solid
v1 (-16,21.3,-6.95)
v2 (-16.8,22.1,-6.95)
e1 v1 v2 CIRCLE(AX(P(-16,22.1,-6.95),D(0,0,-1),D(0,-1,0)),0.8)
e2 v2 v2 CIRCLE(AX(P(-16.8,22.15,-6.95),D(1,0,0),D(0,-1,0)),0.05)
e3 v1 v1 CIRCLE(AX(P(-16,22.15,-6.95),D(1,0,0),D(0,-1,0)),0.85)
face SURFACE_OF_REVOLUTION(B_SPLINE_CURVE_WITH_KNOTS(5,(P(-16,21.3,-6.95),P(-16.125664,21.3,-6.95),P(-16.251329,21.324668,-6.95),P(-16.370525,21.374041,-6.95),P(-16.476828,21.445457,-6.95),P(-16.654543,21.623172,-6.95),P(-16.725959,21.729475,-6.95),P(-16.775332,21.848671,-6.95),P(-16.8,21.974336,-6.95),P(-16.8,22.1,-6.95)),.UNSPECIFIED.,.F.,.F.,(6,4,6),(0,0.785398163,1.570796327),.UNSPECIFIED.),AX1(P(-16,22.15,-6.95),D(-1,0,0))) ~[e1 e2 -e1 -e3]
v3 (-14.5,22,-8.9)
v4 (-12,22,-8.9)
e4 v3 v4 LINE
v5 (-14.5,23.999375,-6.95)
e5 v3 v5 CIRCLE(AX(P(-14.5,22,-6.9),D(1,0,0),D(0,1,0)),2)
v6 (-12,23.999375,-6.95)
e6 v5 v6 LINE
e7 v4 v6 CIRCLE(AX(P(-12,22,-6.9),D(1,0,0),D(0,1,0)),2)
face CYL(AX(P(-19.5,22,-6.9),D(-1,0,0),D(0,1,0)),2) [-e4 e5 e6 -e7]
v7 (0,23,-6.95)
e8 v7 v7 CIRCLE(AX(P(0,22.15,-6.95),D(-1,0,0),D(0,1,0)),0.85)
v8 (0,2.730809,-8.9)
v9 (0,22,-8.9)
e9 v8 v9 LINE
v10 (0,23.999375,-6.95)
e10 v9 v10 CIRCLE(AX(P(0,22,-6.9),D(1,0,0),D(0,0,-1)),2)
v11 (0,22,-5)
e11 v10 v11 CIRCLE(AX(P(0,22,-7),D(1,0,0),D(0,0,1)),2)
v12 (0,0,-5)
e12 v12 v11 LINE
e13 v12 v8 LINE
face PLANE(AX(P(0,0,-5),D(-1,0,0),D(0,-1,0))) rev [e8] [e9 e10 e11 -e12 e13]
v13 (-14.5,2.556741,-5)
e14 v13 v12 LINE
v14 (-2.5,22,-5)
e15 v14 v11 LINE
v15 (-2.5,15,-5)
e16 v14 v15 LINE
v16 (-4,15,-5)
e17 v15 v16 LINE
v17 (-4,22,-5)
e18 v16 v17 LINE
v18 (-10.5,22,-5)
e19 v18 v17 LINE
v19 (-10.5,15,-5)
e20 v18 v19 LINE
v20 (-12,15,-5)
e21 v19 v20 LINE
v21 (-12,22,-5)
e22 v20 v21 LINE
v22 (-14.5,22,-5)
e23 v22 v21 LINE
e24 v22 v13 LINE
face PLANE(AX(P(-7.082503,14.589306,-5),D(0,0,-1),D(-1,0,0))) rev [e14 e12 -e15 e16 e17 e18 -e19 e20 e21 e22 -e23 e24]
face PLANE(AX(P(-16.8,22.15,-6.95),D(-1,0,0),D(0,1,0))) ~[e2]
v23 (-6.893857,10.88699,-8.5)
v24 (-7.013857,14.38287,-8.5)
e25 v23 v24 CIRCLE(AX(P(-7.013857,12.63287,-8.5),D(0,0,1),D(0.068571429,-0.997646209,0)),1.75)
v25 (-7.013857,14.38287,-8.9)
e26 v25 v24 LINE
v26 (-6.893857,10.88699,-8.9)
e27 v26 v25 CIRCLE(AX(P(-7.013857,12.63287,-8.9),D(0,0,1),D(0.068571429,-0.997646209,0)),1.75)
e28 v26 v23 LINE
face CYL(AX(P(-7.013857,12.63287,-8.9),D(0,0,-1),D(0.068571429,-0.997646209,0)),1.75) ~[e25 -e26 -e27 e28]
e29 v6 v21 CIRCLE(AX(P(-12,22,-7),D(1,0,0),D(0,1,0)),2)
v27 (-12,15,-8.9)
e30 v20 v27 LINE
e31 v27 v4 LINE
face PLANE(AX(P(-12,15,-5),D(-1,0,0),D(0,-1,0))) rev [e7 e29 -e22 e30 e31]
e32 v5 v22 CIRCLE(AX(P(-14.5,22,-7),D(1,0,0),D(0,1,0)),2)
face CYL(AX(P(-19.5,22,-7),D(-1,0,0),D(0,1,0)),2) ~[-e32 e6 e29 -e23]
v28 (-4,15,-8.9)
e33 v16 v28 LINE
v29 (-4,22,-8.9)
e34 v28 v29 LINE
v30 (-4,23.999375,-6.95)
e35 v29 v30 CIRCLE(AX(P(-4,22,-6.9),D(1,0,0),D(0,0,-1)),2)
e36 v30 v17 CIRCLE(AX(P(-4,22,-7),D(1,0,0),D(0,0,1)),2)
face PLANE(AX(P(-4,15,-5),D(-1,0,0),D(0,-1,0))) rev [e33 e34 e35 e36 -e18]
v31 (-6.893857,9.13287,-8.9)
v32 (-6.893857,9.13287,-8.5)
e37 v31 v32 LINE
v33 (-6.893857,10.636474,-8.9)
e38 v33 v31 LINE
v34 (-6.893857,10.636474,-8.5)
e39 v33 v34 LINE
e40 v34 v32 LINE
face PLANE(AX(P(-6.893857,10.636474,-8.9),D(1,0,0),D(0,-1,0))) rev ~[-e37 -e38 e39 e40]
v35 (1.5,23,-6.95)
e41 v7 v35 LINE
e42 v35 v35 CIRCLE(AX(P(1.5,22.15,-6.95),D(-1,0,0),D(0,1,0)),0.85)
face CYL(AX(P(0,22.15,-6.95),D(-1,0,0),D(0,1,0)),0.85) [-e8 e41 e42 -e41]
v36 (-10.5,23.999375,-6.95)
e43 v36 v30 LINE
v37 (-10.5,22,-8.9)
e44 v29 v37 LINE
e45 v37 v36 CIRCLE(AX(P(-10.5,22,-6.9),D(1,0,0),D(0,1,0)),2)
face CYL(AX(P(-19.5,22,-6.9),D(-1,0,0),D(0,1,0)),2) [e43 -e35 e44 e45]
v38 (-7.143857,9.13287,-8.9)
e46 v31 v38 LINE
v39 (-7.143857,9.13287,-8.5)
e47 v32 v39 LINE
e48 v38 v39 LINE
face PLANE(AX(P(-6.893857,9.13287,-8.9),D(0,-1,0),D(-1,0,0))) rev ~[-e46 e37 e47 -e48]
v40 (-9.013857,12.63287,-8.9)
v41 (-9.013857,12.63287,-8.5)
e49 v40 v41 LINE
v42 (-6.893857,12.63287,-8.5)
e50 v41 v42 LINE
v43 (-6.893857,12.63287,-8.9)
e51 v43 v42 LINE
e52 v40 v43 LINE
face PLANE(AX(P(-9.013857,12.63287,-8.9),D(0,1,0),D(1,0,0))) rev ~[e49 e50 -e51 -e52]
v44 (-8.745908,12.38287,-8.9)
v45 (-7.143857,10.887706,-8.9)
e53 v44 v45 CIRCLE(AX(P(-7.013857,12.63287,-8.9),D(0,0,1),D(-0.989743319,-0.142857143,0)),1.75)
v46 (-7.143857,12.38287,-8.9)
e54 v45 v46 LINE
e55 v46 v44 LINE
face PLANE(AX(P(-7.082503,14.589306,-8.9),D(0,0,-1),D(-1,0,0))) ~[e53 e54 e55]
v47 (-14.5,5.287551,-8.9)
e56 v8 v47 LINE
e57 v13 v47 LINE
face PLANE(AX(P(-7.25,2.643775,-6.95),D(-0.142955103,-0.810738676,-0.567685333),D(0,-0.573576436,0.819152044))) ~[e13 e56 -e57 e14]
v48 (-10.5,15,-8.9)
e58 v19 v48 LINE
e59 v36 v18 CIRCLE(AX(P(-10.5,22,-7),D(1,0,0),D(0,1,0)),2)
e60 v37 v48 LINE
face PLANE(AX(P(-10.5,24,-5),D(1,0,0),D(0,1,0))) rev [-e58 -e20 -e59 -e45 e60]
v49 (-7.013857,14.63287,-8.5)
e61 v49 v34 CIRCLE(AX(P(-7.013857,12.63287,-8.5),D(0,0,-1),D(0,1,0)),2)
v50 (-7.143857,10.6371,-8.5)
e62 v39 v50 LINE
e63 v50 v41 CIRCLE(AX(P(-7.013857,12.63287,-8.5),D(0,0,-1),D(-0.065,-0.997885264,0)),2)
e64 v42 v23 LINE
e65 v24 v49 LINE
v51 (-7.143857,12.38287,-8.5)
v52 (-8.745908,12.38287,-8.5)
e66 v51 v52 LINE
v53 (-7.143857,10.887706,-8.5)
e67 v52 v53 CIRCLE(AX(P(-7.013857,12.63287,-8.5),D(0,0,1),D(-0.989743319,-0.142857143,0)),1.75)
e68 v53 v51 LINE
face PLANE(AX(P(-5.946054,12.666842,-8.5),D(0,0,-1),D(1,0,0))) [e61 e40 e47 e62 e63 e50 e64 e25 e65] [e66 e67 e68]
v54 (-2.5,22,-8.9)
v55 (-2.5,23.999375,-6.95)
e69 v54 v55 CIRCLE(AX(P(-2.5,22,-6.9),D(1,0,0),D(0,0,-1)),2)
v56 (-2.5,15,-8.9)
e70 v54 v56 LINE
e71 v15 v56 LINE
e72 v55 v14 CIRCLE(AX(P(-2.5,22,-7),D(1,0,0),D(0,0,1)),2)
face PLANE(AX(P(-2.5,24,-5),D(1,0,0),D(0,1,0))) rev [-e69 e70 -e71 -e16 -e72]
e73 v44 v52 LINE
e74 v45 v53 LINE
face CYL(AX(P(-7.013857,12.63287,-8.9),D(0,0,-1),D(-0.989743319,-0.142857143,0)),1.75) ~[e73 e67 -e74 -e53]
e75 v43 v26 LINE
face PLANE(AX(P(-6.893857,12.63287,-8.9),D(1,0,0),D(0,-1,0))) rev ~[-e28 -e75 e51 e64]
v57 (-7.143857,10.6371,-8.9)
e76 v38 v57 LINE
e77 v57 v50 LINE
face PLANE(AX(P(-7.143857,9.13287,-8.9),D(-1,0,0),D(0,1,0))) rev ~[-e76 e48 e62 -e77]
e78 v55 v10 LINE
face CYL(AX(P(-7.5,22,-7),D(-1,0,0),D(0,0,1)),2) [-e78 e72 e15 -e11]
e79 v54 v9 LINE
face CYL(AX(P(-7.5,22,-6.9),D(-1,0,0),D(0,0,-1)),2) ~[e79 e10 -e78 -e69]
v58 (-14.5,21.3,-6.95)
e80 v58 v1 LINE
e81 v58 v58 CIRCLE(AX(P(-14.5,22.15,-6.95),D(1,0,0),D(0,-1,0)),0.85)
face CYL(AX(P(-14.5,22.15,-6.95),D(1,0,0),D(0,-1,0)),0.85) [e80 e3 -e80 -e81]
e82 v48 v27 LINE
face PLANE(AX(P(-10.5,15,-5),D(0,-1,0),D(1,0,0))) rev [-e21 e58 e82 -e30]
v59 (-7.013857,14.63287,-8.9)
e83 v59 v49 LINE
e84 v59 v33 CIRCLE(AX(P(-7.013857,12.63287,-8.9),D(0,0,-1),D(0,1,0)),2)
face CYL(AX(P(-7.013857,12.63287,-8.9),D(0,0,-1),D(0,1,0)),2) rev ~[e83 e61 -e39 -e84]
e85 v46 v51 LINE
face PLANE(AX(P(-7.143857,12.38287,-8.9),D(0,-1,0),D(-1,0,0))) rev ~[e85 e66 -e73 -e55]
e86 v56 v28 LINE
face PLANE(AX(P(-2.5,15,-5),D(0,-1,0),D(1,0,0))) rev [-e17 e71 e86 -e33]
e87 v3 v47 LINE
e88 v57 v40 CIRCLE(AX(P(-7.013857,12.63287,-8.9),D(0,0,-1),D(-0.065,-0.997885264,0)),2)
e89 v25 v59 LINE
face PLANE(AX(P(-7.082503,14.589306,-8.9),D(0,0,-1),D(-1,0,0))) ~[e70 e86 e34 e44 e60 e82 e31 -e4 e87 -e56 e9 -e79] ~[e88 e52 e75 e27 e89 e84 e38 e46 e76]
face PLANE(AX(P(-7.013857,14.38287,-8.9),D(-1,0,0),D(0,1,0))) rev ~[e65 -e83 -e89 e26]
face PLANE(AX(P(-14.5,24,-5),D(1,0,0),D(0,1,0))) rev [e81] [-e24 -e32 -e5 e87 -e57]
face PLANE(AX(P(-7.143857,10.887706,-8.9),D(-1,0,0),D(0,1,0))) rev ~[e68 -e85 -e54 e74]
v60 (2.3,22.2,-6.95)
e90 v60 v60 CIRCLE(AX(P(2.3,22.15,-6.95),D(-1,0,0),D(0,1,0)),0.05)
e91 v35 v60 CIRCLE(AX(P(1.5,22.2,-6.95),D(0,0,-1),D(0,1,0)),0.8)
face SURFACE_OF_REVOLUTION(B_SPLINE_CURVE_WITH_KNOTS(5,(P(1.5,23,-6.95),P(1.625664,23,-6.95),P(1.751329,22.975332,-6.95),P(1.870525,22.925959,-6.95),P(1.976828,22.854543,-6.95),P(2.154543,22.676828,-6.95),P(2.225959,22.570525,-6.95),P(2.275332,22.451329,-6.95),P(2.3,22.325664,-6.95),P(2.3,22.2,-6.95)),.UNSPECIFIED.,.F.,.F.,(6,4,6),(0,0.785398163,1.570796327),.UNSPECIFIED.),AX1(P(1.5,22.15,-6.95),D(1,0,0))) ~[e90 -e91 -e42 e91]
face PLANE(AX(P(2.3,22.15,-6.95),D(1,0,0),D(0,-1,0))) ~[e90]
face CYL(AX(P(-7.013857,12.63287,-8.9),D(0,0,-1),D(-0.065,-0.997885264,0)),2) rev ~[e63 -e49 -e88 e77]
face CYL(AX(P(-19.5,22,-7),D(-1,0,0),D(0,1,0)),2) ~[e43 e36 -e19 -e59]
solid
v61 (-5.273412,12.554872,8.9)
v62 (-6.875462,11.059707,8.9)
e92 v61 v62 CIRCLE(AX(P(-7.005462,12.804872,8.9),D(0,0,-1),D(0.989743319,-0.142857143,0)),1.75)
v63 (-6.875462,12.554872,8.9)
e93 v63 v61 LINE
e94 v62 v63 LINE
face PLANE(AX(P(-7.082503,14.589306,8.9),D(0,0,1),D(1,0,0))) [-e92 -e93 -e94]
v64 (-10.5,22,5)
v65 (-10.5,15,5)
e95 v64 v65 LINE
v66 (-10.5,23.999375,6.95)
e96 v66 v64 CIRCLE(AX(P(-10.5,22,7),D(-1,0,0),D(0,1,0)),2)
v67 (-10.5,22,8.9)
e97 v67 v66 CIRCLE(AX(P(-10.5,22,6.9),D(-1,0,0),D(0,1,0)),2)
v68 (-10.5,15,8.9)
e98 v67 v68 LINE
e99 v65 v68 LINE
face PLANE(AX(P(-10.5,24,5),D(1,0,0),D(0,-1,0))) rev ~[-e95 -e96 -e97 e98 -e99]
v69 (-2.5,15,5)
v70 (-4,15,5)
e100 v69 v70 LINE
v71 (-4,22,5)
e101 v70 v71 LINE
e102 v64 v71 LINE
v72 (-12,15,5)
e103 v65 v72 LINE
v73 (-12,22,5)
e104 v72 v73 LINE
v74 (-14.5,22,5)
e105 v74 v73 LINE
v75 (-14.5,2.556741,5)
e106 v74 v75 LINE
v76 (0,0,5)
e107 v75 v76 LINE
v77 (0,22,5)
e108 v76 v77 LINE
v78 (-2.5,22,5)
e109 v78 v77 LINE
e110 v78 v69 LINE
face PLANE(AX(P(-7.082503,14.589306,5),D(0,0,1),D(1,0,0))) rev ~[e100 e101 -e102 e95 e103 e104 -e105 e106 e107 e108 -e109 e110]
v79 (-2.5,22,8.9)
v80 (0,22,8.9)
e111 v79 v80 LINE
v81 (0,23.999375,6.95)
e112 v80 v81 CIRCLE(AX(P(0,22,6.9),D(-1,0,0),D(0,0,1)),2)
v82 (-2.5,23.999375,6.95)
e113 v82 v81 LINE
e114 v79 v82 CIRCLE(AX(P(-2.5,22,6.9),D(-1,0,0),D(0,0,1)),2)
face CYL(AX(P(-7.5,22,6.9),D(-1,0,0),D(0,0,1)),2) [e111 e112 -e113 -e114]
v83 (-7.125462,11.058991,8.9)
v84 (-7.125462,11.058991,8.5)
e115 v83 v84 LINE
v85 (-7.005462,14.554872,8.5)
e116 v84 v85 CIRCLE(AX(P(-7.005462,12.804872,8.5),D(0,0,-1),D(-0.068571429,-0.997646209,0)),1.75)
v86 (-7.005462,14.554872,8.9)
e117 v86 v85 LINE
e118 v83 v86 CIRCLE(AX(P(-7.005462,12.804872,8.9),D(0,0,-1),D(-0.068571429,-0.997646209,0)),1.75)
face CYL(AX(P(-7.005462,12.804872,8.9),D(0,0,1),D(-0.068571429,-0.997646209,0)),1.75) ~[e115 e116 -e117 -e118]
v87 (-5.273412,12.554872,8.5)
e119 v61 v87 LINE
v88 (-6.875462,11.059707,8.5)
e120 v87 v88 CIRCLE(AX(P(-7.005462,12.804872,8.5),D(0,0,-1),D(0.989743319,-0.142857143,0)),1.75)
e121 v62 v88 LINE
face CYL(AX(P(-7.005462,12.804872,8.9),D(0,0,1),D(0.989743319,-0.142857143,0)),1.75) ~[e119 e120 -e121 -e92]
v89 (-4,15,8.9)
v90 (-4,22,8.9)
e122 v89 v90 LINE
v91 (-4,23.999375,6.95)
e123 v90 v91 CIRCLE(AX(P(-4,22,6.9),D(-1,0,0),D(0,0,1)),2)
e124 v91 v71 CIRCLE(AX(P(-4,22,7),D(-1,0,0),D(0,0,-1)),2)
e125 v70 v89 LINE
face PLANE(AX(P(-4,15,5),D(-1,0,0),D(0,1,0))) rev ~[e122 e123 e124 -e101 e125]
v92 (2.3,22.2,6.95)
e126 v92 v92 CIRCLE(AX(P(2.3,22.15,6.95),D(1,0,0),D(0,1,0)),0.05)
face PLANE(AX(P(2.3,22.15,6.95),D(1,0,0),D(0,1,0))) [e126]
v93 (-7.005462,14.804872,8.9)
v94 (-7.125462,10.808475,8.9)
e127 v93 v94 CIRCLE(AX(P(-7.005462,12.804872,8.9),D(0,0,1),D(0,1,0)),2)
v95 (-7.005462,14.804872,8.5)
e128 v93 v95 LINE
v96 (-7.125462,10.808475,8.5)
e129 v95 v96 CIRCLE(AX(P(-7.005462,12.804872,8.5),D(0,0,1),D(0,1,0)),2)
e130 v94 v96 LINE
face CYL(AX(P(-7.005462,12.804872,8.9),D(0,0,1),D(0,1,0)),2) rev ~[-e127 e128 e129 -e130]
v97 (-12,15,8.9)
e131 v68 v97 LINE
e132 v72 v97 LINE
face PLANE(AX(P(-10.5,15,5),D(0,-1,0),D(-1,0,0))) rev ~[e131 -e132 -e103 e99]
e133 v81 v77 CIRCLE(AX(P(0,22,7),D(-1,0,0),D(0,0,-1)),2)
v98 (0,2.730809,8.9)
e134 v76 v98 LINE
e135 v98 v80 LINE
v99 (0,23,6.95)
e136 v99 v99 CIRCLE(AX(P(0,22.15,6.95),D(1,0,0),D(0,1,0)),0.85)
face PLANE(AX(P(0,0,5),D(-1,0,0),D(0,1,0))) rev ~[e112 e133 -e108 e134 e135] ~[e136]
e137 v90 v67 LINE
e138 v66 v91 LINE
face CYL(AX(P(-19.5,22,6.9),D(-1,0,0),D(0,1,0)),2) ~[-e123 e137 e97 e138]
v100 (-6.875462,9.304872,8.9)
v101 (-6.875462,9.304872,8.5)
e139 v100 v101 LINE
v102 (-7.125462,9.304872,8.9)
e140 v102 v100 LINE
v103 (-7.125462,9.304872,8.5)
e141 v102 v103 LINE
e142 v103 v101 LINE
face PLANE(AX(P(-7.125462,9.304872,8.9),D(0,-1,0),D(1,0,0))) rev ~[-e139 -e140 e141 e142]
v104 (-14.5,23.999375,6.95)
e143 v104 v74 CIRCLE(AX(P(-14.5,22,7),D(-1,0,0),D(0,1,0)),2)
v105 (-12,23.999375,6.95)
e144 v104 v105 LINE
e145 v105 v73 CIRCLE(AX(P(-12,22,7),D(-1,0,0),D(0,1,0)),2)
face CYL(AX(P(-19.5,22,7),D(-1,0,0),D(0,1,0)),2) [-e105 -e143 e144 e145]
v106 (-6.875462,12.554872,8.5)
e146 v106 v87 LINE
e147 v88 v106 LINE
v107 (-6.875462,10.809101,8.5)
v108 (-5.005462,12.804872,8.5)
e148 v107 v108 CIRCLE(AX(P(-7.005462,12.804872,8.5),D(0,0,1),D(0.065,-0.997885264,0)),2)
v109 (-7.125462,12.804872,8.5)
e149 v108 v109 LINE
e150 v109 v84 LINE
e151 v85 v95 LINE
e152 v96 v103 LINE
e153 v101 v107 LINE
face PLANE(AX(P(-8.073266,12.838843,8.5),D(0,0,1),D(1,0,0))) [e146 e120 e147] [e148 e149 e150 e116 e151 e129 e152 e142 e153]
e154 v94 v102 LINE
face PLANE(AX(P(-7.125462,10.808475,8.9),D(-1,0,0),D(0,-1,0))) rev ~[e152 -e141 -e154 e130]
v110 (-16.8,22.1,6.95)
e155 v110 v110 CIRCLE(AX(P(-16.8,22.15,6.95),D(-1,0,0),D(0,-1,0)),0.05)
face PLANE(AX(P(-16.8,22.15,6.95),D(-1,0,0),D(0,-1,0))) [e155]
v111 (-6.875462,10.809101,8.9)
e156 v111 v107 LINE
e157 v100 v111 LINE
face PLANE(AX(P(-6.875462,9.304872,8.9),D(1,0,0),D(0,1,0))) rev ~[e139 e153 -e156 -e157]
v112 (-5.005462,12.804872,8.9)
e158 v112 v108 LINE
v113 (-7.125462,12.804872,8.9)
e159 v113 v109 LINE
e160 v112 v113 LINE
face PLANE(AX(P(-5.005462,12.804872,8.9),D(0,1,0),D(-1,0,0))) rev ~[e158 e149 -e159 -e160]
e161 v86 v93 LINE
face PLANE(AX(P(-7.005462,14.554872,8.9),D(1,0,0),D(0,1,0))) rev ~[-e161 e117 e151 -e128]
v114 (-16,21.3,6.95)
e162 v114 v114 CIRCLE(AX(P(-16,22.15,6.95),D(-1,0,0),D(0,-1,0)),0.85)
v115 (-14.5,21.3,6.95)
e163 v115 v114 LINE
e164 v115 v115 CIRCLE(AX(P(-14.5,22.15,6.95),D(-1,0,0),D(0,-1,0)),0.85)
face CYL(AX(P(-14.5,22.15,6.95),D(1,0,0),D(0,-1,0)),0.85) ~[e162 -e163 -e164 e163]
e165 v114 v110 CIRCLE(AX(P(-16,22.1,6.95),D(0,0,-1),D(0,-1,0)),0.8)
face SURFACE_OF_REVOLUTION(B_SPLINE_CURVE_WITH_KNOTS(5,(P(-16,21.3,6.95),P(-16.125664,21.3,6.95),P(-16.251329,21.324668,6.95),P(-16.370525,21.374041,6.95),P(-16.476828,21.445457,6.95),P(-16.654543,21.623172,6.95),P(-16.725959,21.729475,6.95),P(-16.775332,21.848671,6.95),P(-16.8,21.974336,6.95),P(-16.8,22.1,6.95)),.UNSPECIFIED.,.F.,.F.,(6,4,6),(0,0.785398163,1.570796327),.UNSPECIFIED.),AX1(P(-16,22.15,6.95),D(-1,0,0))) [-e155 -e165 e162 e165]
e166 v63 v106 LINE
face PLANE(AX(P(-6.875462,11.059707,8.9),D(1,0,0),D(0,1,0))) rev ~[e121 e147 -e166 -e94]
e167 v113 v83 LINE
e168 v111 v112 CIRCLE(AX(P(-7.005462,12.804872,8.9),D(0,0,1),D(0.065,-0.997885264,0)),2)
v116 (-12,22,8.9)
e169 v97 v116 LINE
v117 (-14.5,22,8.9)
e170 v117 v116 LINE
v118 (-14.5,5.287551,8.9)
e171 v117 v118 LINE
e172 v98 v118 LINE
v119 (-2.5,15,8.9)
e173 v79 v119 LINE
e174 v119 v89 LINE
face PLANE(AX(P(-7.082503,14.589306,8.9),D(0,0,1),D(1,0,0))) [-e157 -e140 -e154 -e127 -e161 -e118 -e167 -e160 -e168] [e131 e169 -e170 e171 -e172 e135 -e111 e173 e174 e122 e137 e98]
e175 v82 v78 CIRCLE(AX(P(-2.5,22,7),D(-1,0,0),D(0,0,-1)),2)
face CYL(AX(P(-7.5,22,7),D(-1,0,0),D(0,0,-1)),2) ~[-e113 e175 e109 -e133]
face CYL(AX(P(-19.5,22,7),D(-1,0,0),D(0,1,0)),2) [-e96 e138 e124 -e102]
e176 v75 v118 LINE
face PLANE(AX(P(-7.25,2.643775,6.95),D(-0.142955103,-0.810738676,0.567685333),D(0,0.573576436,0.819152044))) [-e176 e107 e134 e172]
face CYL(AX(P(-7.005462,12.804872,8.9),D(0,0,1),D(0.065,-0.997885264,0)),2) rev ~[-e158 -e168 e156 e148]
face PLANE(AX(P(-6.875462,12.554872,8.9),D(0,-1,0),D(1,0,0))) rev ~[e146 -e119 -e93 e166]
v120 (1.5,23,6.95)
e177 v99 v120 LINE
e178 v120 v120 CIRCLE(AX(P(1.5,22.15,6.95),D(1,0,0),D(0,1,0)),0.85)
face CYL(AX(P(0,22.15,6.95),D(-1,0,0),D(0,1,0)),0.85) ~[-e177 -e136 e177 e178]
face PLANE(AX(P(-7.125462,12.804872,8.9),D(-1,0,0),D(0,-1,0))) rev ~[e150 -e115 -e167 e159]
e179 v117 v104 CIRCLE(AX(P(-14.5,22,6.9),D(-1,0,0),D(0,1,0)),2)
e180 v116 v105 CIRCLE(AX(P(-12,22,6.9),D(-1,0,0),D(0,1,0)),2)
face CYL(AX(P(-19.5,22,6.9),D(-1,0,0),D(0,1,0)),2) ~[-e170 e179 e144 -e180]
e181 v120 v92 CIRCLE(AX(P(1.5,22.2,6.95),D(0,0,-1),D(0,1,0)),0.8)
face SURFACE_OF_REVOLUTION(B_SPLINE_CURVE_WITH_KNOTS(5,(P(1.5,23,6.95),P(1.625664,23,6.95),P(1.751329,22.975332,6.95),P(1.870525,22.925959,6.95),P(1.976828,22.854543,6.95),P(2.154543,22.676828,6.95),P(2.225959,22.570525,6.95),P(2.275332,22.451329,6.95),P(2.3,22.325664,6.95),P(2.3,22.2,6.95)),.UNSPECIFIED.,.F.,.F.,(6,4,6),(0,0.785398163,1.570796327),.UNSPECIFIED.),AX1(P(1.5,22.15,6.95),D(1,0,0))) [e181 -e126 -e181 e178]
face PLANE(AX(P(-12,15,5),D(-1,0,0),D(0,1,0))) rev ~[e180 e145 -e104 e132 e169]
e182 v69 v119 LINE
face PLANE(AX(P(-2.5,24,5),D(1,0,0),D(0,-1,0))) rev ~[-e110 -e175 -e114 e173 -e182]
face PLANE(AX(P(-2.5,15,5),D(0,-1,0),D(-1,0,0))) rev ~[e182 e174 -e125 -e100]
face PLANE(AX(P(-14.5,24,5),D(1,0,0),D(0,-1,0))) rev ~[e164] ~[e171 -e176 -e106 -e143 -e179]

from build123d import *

# Parameters (mm, degrees)
F1_DEPTH    = 3.9
F2_R        = 0.85
F3_DEPTH    = 2.3
F4_R        = 0.85
F5_DEPTH    = 2.3
F6_R        = 0.8
F7_T1_DEPTH = 12.5
F7_T3_DEPTH = 12.5
F13_DEPTH   = 0.4
F15_DEPTH   = 0.4


# Not quite as in the source:
# - a fillet or chamfer that OpenCascade refuses, or shapes differently, is made with other operations: its cross-section is extruded or revolved along the edge and cut away or added
# - a feature names something its author has since deleted; it is built from what else it names


with BuildPart() as f1:
    # F0 (on Top) → F1 (new body)
    with BuildSketch(Plane.XY):
        Polygon((-14.5, 2.5567412203), (0, 0), (0, 24), (-2.5, 24), (-2.5, 15), (-4, 15), (-4, 24), (-10.5, 24), (-10.5, 15), (-12, 15), (-12, 24), (-14.5, 24), align=None)
    extrude(amount=F1_DEPTH)

    # F2 (on face) → F3 (join)
    with BuildSketch(Plane.YZ):
        with Locations((22.15, 1.95)):
            Circle(F2_R)
    extrude(amount=F3_DEPTH)

    # F4 (on face) → F5 (join)
    with BuildSketch(Plane(origin=(-14.5, 0, 0), x_dir=(0, -1, 0), z_dir=(-1, 0, 0))):
        with Locations((-22.15, 1.95)):
            Circle(F4_R)
    extrude(amount=F5_DEPTH)

    # F6
    f6_edges = [f1.edges().sort_by_distance(p)[0] for p in [
        (2.3, 21.3, 1.95),
        (-16.8, 23, 1.95),
    ]]
    fillet(f6_edges, radius=F6_R)

    # F7: fillet of radius 2 on 4 edges, made by hand

    # F7_s2 → F7_t1 (cut)
    with BuildSketch(Plane.YZ.offset(-19.5)):
        with BuildLine():
            ThreePointArc((24, 1.9), (23.4142135624, 3.3142135624), (22, 3.9))
            Line((22, 3.9), (24, 3.9))
            Line((24, 3.9), (24, 1.9))
        make_face()
        with BuildLine():
            ThreePointArc((24, 2), (23.4142135624, 0.5857864376), (22, 0))
            Line((22, 0), (24, 0))
            Line((24, 0), (24, 2))
        make_face()
    extrude(amount=F7_T1_DEPTH, mode=Mode.SUBTRACT)

    # F7_s4 → F7_t3 (cut)
    with BuildSketch(Plane.YZ.offset(-7.5)):
        with BuildLine():
            ThreePointArc((22, 3.9), (23.4142135624, 3.3142135624), (24, 1.9))
            Line((24, 1.9), (24, 3.9))
            Line((24, 3.9), (22, 3.9))
        make_face()
        with BuildLine():
            ThreePointArc((22, 0), (23.4142135624, 0.5857864376), (24, 2))
            Line((24, 2), (24, 0))
            Line((24, 0), (22, 0))
        make_face()
    extrude(amount=F7_T3_DEPTH, mode=Mode.SUBTRACT)

    # F9: sweep along a path in F9_path
    with BuildLine(Plane(origin=(0, 0, 3.9), x_dir=(0.984807753, -0.1736481777, 0), z_dir=(0.1736481777, 0.984807753, 0))) as f9_path:
        Line((0, 0), (-14.7236858723, 0))
    # F8 (on face) → F9 (sweep, cut)
    with BuildSketch(Plane.YZ):
        Polygon((0, 3.9), (0, 0), (2.730809399, 3.9), align=None)
    sweep(path=f9_path.line, mode=Mode.SUBTRACT)


with BuildPart() as f1_1:
    # F10: moved
    add(f1.part.moved(Location((0, 0, 5))))


with BuildPart() as f11_1:
    # F11: instance of F1
    add(f1_1.part.mirror(Plane.XY))

    # F14 (on face) → F15 (cut)
    with BuildSketch(Plane(origin=(0, 0, -8.9), x_dir=(1, 0, 0), z_dir=(0, 0, -1))):
        with BuildLine():
            Line((-7.0138571055, -14.382870473), (-7.0138571055, -14.632870473))
            ThreePointArc((-7.0138571055, -14.632870473), (-5.0147581199, -12.6928975156), (-6.8938571055, -10.6364737188))
            Line((-6.8938571055, -10.6364737188), (-6.8938571055, -10.8869896065))
            ThreePointArc((-6.8938571055, -10.8869896065), (-5.264887192, -12.692905811), (-7.0138571055, -14.382870473))
        make_face()
        with BuildLine():
            Line((-6.8938571055, -12.632870473), (-6.8938571055, -10.8869896065))
            ThreePointArc((-6.8938571055, -10.8869896065), (-7.0188699097, -10.8828776525), (-7.1438571055, -10.8877057243))
            Line((-7.1438571055, -10.8877057243), (-7.1438571055, -12.382870473))
            Line((-7.1438571055, -12.382870473), (-8.745907913, -12.382870473))
            ThreePointArc((-8.745907913, -12.382870473), (-8.7593640395, -12.5075487136), (-8.7638571055, -12.632870473))
            Line((-8.7638571055, -12.632870473), (-6.8938571055, -12.632870473))
        make_face()
        with BuildLine():
            Line((-7.1438571055, -10.8877057243), (-7.1438571055, -10.6370999451))
            ThreePointArc((-7.1438571055, -10.6370999451), (-8.4733090574, -11.2653910398), (-9.0138571055, -12.632870473))
            Line((-9.0138571055, -12.632870473), (-8.7638571055, -12.632870473))
            ThreePointArc((-8.7638571055, -12.632870473), (-8.7593640395, -12.5075487136), (-8.745907913, -12.382870473))
            ThreePointArc((-8.745907913, -12.382870473), (-8.2078787589, -11.3534908221), (-7.1438571055, -10.8877057243))
        make_face()
        with BuildLine():
            Line((-6.8938571055, -10.8869896065), (-6.8938571055, -10.6364737188))
            ThreePointArc((-6.8938571055, -10.6364737188), (-7.0188668999, -10.6328767475), (-7.1438571055, -10.6370999451))
            Line((-7.1438571055, -10.6370999451), (-7.1438571055, -10.8877057243))
            ThreePointArc((-7.1438571055, -10.8877057243), (-7.0188699097, -10.8828776525), (-6.8938571055, -10.8869896065))
        make_face()
        with BuildLine():
            ThreePointArc((-7.1438571055, -10.6370999451), (-7.0188668999, -10.6328767475), (-6.8938571055, -10.6364737188))
            Line((-6.8938571055, -10.6364737188), (-6.8938571055, -9.132870473))
            Line((-6.8938571055, -9.132870473), (-7.1438571055, -9.132870473))
            Line((-7.1438571055, -9.132870473), (-7.1438571055, -10.6370999451))
        make_face()
    extrude(amount=-F15_DEPTH, mode=Mode.SUBTRACT)


with BuildPart() as f1_2:
    add(f1_1.part)

    # F12 (on face) → F13 (cut)
    with BuildSketch(Plane.XY.offset(8.9)):
        with BuildLine():
            Line((-7.0054624054, 14.5548715198), (-7.0054624054, 14.8048715198))
            ThreePointArc((-7.0054624054, 14.8048715198), (-9.004561391, 12.8648985624), (-7.1254624054, 10.8084747656))
            Line((-7.1254624054, 10.8084747656), (-7.1254624054, 11.0589906533))
            ThreePointArc((-7.1254624054, 11.0589906533), (-8.7544323188, 12.8649068578), (-7.0054624054, 14.5548715198))
        make_face()
        with BuildLine():
            Line((-6.8754624054, 11.0597067711), (-6.8754624054, 10.8091009919))
            ThreePointArc((-6.8754624054, 10.8091009919), (-5.5460104535, 11.4373920867), (-5.0054624054, 12.8048715198))
            Line((-5.0054624054, 12.8048715198), (-5.2554624054, 12.8048715198))
            ThreePointArc((-5.2554624054, 12.8048715198), (-5.2599554714, 12.6795497604), (-5.2734115978, 12.5548715198))
            ThreePointArc((-5.2734115978, 12.5548715198), (-5.8114407519, 11.5254918689), (-6.8754624054, 11.0597067711))
        make_face()
        with BuildLine():
            Line((-7.1254624054, 12.8048715198), (-7.1254624054, 11.0589906533))
            ThreePointArc((-7.1254624054, 11.0589906533), (-7.0004496012, 11.0548786993), (-6.8754624054, 11.0597067711))
            Line((-6.8754624054, 11.0597067711), (-6.8754624054, 12.5548715198))
            Line((-6.8754624054, 12.5548715198), (-5.2734115978, 12.5548715198))
            ThreePointArc((-5.2734115978, 12.5548715198), (-5.2599554714, 12.6795497604), (-5.2554624054, 12.8048715198))
            Line((-5.2554624054, 12.8048715198), (-7.1254624054, 12.8048715198))
        make_face()
        with BuildLine():
            Line((-7.1254624054, 11.0589906533), (-7.1254624054, 10.8084747656))
            ThreePointArc((-7.1254624054, 10.8084747656), (-7.000452611, 10.8048777943), (-6.8754624054, 10.8091009919))
            Line((-6.8754624054, 10.8091009919), (-6.8754624054, 11.0597067711))
            ThreePointArc((-6.8754624054, 11.0597067711), (-7.0004496012, 11.0548786993), (-7.1254624054, 11.0589906533))
        make_face()
        with BuildLine():
            ThreePointArc((-6.8754624054, 10.8091009919), (-7.000452611, 10.8048777943), (-7.1254624054, 10.8084747656))
            Line((-7.1254624054, 10.8084747656), (-7.1254624054, 9.3048715198))
            Line((-7.1254624054, 9.3048715198), (-6.8754624054, 9.3048715198))
            Line((-6.8754624054, 9.3048715198), (-6.8754624054, 10.8091009919))
        make_face()
    extrude(amount=-F13_DEPTH, mode=Mode.SUBTRACT)


solid = Compound([f11_1.part, f1_2.part])
